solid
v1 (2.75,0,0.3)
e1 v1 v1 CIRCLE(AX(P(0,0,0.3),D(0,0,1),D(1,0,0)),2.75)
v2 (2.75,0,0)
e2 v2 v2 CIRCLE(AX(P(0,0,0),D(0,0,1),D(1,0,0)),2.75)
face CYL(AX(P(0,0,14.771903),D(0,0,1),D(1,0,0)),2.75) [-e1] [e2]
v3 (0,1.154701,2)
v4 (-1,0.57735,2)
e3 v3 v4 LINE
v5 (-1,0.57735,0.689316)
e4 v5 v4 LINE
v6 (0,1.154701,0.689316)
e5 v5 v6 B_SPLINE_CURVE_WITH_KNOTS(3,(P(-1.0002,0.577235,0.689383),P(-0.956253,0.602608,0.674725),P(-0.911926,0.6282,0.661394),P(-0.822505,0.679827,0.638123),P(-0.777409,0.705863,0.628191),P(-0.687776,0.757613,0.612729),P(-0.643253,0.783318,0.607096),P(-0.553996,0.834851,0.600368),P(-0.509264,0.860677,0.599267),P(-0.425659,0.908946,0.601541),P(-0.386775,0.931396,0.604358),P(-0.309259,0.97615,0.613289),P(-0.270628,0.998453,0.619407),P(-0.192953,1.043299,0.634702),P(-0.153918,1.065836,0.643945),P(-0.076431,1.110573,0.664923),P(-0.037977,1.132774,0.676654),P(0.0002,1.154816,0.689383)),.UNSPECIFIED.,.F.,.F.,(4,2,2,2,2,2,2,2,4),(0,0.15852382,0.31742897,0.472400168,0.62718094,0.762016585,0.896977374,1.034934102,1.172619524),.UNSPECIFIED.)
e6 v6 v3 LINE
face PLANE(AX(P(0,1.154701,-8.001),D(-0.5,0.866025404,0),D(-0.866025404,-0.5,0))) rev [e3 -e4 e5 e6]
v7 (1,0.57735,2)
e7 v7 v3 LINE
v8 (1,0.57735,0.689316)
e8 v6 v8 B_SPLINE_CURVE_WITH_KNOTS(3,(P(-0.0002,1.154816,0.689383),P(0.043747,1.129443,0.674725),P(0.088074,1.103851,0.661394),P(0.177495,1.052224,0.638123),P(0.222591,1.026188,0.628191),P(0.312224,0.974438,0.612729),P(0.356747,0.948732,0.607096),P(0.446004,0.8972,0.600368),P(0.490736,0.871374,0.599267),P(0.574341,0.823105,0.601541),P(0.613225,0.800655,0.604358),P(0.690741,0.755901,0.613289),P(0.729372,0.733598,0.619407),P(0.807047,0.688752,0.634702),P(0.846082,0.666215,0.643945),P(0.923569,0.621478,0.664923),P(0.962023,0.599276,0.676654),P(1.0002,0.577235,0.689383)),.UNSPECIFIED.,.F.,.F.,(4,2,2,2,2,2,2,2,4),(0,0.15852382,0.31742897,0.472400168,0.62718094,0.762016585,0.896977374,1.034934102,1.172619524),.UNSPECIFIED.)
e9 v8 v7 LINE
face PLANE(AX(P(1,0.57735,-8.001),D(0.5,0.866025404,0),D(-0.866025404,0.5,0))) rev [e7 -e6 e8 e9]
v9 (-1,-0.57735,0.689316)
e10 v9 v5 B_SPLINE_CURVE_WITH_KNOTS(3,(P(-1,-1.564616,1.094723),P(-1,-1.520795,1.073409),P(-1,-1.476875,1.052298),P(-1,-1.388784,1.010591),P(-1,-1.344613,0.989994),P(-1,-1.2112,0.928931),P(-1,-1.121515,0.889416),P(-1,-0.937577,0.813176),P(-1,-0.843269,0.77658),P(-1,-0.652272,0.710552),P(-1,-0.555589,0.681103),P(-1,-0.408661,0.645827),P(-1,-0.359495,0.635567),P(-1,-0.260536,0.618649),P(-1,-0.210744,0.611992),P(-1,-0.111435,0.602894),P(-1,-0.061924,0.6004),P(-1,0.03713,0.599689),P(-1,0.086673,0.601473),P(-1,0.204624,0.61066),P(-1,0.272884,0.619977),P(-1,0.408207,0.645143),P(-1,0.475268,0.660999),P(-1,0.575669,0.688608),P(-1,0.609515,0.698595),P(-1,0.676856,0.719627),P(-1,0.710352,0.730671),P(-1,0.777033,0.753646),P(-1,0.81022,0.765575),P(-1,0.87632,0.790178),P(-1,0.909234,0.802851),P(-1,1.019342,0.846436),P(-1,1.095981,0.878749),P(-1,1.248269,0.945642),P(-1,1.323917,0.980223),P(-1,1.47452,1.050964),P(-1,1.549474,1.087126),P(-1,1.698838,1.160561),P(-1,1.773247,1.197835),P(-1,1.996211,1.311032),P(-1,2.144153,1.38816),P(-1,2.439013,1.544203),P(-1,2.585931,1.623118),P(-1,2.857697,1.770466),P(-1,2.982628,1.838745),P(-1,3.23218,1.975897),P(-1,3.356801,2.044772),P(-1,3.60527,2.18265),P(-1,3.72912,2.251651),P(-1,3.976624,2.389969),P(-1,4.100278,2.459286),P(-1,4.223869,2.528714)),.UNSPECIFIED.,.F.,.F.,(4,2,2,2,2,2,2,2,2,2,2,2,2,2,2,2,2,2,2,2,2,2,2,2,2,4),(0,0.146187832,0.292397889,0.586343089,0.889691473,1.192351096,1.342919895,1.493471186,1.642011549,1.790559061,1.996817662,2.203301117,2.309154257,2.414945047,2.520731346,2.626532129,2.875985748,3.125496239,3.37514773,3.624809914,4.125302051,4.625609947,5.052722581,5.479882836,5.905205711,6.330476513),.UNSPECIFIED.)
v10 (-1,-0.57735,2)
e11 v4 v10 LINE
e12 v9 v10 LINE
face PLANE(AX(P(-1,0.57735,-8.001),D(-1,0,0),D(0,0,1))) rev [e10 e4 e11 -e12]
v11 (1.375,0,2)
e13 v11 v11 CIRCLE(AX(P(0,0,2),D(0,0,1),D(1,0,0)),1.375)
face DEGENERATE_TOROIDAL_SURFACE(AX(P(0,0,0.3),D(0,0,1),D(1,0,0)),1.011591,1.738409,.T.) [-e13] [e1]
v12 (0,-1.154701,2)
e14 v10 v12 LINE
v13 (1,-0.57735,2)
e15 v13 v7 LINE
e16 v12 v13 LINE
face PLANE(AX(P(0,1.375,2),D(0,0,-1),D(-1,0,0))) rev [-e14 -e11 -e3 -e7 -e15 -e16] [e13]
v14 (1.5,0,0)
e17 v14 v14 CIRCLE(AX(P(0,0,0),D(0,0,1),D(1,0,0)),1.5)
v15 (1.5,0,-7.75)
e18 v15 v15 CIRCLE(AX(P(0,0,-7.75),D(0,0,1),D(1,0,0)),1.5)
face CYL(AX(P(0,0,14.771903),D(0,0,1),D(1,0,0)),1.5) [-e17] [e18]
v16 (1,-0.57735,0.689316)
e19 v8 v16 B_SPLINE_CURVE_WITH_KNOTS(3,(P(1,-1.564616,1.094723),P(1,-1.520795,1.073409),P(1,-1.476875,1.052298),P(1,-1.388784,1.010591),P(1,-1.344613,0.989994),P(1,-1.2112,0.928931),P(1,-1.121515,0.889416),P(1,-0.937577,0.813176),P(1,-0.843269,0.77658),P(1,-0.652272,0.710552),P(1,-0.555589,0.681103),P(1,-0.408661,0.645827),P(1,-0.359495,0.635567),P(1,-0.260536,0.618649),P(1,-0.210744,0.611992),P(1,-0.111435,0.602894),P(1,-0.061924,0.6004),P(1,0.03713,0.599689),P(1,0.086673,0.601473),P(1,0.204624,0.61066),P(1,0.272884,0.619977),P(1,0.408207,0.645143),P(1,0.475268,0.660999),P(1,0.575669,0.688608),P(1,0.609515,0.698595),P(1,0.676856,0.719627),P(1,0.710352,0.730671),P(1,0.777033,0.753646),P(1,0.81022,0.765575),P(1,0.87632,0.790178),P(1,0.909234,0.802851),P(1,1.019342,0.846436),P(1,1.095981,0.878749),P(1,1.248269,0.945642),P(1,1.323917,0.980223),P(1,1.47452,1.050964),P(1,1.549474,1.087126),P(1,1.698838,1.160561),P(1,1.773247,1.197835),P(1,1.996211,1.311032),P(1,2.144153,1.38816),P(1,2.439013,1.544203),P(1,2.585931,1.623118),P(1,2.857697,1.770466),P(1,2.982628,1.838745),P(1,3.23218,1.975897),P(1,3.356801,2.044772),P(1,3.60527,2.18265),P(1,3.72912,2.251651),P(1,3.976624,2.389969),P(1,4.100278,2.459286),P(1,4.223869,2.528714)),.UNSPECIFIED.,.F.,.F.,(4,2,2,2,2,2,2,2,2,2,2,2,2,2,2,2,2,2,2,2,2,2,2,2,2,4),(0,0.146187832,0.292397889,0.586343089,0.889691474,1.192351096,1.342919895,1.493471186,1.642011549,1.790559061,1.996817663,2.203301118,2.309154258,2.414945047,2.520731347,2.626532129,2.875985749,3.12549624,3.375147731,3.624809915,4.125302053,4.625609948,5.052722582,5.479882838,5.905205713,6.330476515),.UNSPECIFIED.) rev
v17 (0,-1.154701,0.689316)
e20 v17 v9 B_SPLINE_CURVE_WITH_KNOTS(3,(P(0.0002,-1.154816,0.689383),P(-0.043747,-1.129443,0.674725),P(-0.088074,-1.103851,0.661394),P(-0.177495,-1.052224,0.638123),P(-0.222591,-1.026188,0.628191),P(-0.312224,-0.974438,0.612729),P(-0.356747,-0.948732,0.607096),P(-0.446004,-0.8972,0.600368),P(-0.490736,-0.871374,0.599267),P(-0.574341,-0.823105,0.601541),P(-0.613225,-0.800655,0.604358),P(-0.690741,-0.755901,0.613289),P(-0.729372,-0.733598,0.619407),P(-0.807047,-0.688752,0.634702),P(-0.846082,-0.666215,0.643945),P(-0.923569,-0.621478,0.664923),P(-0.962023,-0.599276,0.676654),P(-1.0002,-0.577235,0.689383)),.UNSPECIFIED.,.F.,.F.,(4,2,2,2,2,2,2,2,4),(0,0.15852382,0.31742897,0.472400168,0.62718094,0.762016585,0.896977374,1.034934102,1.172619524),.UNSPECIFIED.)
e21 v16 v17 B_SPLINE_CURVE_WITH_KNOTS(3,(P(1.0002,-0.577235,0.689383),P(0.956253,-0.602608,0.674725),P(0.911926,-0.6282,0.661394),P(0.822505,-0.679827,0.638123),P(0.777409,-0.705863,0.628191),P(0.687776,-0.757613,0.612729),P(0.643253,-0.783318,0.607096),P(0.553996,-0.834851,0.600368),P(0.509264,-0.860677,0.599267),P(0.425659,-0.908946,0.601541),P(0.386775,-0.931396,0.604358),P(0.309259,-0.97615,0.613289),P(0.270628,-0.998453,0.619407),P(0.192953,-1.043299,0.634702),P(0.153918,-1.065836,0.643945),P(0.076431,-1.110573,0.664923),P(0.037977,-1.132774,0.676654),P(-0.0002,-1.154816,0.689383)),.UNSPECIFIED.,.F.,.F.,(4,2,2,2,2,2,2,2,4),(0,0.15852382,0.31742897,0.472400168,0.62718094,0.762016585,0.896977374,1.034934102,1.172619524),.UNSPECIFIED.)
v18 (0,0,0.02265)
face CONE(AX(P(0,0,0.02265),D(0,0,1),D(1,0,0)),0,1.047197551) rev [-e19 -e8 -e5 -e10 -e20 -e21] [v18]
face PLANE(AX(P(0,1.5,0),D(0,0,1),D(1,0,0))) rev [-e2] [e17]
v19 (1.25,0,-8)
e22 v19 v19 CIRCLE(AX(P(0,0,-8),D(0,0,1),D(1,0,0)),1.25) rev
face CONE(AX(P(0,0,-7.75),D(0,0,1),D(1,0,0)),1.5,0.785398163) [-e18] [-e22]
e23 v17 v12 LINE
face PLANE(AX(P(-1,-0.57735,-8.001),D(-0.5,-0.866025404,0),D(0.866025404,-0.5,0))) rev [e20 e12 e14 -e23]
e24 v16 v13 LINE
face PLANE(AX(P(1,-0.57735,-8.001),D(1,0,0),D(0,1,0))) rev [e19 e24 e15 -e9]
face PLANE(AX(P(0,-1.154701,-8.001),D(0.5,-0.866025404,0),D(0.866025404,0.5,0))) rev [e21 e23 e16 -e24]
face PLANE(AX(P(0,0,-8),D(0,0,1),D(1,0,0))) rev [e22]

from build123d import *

# Parameters (mm, degrees)
CHAMFER1_SIZE      = 0.25
CUT_EXTRUDE1_REACH = 12.73


with BuildPart() as part:
    # Sketch2 → Revolve1 (revolve)
    with BuildSketch(Plane(origin=(0, 0, 0), x_dir=(0, 0, -1), z_dir=(1, 0, 0))):
        with BuildLine():
            Line((8, 0), (8, 1.5))
            Line((8, 1.5), (0, 1.5))
            Line((0, 1.5), (0, 2.75))
            Line((0, 2.75), (-0.3, 2.75))
            ThreePointArc((-0.3, 2.75), (-1.39323202, 2.363223225), (-2, 1.375))
            Line((-2, 1.375), (-2, 0))
            Line((-2, 0), (8, 0))
        make_face()
    revolve(axis=Axis((0, 0, 14.771903323), (0, 0, -1)))

    # Chamfer1
    chamfer1_edges = [part.edges().sort_by_distance(p)[0] for p in [
        (0, -1.5, -8),
    ]]
    chamfer(chamfer1_edges, length=CHAMFER1_SIZE)

    # Sketch3 → Cut-Revolve1 (revolve, cut)
    with BuildSketch(Plane(origin=(0, 0, 0), x_dir=(0, 0, -1), z_dir=(1, 0, 0))):
        Polygon((-2, 0), (-2, 1), (-0.6, 1), (-0.022649731, 0), align=None)
    revolve(axis=Axis((0, 0, 1.261909675), (0, 0, -1)), mode=Mode.SUBTRACT)

    # Cut-Extrude1: up to this cone (the profile starts inside it)
    cut_extrude1_end = Plane(origin=(0, 0, 2), z_dir=(0, 0, 1)).offset(-1.977349269) * Cone(1.732e-06, 32.271954122, 18.6322204, align=(Align.CENTER, Align.CENTER, Align.MIN), mode=Mode.PRIVATE)
    # Sketch4 → Cut-Extrude1 (cut, up to the surface)
    with BuildSketch(Plane.XY.offset(2), mode=Mode.PRIVATE) as cut_extrude1_sk1:
        Polygon((0, 1.154700538), (-1, 0.577350269), (-1, -0.577350269), (0, -1.154700538), (1, -0.577350269), (1, 0.577350269), align=None)
    cut_extrude1_tool1 = extrude(cut_extrude1_sk1.sketch, amount=-CUT_EXTRUDE1_REACH, mode=Mode.PRIVATE) & cut_extrude1_end
    add(cut_extrude1_tool1.solids().sort_by_distance((0, 0, 2))[0], mode=Mode.SUBTRACT)


solid = part.part
